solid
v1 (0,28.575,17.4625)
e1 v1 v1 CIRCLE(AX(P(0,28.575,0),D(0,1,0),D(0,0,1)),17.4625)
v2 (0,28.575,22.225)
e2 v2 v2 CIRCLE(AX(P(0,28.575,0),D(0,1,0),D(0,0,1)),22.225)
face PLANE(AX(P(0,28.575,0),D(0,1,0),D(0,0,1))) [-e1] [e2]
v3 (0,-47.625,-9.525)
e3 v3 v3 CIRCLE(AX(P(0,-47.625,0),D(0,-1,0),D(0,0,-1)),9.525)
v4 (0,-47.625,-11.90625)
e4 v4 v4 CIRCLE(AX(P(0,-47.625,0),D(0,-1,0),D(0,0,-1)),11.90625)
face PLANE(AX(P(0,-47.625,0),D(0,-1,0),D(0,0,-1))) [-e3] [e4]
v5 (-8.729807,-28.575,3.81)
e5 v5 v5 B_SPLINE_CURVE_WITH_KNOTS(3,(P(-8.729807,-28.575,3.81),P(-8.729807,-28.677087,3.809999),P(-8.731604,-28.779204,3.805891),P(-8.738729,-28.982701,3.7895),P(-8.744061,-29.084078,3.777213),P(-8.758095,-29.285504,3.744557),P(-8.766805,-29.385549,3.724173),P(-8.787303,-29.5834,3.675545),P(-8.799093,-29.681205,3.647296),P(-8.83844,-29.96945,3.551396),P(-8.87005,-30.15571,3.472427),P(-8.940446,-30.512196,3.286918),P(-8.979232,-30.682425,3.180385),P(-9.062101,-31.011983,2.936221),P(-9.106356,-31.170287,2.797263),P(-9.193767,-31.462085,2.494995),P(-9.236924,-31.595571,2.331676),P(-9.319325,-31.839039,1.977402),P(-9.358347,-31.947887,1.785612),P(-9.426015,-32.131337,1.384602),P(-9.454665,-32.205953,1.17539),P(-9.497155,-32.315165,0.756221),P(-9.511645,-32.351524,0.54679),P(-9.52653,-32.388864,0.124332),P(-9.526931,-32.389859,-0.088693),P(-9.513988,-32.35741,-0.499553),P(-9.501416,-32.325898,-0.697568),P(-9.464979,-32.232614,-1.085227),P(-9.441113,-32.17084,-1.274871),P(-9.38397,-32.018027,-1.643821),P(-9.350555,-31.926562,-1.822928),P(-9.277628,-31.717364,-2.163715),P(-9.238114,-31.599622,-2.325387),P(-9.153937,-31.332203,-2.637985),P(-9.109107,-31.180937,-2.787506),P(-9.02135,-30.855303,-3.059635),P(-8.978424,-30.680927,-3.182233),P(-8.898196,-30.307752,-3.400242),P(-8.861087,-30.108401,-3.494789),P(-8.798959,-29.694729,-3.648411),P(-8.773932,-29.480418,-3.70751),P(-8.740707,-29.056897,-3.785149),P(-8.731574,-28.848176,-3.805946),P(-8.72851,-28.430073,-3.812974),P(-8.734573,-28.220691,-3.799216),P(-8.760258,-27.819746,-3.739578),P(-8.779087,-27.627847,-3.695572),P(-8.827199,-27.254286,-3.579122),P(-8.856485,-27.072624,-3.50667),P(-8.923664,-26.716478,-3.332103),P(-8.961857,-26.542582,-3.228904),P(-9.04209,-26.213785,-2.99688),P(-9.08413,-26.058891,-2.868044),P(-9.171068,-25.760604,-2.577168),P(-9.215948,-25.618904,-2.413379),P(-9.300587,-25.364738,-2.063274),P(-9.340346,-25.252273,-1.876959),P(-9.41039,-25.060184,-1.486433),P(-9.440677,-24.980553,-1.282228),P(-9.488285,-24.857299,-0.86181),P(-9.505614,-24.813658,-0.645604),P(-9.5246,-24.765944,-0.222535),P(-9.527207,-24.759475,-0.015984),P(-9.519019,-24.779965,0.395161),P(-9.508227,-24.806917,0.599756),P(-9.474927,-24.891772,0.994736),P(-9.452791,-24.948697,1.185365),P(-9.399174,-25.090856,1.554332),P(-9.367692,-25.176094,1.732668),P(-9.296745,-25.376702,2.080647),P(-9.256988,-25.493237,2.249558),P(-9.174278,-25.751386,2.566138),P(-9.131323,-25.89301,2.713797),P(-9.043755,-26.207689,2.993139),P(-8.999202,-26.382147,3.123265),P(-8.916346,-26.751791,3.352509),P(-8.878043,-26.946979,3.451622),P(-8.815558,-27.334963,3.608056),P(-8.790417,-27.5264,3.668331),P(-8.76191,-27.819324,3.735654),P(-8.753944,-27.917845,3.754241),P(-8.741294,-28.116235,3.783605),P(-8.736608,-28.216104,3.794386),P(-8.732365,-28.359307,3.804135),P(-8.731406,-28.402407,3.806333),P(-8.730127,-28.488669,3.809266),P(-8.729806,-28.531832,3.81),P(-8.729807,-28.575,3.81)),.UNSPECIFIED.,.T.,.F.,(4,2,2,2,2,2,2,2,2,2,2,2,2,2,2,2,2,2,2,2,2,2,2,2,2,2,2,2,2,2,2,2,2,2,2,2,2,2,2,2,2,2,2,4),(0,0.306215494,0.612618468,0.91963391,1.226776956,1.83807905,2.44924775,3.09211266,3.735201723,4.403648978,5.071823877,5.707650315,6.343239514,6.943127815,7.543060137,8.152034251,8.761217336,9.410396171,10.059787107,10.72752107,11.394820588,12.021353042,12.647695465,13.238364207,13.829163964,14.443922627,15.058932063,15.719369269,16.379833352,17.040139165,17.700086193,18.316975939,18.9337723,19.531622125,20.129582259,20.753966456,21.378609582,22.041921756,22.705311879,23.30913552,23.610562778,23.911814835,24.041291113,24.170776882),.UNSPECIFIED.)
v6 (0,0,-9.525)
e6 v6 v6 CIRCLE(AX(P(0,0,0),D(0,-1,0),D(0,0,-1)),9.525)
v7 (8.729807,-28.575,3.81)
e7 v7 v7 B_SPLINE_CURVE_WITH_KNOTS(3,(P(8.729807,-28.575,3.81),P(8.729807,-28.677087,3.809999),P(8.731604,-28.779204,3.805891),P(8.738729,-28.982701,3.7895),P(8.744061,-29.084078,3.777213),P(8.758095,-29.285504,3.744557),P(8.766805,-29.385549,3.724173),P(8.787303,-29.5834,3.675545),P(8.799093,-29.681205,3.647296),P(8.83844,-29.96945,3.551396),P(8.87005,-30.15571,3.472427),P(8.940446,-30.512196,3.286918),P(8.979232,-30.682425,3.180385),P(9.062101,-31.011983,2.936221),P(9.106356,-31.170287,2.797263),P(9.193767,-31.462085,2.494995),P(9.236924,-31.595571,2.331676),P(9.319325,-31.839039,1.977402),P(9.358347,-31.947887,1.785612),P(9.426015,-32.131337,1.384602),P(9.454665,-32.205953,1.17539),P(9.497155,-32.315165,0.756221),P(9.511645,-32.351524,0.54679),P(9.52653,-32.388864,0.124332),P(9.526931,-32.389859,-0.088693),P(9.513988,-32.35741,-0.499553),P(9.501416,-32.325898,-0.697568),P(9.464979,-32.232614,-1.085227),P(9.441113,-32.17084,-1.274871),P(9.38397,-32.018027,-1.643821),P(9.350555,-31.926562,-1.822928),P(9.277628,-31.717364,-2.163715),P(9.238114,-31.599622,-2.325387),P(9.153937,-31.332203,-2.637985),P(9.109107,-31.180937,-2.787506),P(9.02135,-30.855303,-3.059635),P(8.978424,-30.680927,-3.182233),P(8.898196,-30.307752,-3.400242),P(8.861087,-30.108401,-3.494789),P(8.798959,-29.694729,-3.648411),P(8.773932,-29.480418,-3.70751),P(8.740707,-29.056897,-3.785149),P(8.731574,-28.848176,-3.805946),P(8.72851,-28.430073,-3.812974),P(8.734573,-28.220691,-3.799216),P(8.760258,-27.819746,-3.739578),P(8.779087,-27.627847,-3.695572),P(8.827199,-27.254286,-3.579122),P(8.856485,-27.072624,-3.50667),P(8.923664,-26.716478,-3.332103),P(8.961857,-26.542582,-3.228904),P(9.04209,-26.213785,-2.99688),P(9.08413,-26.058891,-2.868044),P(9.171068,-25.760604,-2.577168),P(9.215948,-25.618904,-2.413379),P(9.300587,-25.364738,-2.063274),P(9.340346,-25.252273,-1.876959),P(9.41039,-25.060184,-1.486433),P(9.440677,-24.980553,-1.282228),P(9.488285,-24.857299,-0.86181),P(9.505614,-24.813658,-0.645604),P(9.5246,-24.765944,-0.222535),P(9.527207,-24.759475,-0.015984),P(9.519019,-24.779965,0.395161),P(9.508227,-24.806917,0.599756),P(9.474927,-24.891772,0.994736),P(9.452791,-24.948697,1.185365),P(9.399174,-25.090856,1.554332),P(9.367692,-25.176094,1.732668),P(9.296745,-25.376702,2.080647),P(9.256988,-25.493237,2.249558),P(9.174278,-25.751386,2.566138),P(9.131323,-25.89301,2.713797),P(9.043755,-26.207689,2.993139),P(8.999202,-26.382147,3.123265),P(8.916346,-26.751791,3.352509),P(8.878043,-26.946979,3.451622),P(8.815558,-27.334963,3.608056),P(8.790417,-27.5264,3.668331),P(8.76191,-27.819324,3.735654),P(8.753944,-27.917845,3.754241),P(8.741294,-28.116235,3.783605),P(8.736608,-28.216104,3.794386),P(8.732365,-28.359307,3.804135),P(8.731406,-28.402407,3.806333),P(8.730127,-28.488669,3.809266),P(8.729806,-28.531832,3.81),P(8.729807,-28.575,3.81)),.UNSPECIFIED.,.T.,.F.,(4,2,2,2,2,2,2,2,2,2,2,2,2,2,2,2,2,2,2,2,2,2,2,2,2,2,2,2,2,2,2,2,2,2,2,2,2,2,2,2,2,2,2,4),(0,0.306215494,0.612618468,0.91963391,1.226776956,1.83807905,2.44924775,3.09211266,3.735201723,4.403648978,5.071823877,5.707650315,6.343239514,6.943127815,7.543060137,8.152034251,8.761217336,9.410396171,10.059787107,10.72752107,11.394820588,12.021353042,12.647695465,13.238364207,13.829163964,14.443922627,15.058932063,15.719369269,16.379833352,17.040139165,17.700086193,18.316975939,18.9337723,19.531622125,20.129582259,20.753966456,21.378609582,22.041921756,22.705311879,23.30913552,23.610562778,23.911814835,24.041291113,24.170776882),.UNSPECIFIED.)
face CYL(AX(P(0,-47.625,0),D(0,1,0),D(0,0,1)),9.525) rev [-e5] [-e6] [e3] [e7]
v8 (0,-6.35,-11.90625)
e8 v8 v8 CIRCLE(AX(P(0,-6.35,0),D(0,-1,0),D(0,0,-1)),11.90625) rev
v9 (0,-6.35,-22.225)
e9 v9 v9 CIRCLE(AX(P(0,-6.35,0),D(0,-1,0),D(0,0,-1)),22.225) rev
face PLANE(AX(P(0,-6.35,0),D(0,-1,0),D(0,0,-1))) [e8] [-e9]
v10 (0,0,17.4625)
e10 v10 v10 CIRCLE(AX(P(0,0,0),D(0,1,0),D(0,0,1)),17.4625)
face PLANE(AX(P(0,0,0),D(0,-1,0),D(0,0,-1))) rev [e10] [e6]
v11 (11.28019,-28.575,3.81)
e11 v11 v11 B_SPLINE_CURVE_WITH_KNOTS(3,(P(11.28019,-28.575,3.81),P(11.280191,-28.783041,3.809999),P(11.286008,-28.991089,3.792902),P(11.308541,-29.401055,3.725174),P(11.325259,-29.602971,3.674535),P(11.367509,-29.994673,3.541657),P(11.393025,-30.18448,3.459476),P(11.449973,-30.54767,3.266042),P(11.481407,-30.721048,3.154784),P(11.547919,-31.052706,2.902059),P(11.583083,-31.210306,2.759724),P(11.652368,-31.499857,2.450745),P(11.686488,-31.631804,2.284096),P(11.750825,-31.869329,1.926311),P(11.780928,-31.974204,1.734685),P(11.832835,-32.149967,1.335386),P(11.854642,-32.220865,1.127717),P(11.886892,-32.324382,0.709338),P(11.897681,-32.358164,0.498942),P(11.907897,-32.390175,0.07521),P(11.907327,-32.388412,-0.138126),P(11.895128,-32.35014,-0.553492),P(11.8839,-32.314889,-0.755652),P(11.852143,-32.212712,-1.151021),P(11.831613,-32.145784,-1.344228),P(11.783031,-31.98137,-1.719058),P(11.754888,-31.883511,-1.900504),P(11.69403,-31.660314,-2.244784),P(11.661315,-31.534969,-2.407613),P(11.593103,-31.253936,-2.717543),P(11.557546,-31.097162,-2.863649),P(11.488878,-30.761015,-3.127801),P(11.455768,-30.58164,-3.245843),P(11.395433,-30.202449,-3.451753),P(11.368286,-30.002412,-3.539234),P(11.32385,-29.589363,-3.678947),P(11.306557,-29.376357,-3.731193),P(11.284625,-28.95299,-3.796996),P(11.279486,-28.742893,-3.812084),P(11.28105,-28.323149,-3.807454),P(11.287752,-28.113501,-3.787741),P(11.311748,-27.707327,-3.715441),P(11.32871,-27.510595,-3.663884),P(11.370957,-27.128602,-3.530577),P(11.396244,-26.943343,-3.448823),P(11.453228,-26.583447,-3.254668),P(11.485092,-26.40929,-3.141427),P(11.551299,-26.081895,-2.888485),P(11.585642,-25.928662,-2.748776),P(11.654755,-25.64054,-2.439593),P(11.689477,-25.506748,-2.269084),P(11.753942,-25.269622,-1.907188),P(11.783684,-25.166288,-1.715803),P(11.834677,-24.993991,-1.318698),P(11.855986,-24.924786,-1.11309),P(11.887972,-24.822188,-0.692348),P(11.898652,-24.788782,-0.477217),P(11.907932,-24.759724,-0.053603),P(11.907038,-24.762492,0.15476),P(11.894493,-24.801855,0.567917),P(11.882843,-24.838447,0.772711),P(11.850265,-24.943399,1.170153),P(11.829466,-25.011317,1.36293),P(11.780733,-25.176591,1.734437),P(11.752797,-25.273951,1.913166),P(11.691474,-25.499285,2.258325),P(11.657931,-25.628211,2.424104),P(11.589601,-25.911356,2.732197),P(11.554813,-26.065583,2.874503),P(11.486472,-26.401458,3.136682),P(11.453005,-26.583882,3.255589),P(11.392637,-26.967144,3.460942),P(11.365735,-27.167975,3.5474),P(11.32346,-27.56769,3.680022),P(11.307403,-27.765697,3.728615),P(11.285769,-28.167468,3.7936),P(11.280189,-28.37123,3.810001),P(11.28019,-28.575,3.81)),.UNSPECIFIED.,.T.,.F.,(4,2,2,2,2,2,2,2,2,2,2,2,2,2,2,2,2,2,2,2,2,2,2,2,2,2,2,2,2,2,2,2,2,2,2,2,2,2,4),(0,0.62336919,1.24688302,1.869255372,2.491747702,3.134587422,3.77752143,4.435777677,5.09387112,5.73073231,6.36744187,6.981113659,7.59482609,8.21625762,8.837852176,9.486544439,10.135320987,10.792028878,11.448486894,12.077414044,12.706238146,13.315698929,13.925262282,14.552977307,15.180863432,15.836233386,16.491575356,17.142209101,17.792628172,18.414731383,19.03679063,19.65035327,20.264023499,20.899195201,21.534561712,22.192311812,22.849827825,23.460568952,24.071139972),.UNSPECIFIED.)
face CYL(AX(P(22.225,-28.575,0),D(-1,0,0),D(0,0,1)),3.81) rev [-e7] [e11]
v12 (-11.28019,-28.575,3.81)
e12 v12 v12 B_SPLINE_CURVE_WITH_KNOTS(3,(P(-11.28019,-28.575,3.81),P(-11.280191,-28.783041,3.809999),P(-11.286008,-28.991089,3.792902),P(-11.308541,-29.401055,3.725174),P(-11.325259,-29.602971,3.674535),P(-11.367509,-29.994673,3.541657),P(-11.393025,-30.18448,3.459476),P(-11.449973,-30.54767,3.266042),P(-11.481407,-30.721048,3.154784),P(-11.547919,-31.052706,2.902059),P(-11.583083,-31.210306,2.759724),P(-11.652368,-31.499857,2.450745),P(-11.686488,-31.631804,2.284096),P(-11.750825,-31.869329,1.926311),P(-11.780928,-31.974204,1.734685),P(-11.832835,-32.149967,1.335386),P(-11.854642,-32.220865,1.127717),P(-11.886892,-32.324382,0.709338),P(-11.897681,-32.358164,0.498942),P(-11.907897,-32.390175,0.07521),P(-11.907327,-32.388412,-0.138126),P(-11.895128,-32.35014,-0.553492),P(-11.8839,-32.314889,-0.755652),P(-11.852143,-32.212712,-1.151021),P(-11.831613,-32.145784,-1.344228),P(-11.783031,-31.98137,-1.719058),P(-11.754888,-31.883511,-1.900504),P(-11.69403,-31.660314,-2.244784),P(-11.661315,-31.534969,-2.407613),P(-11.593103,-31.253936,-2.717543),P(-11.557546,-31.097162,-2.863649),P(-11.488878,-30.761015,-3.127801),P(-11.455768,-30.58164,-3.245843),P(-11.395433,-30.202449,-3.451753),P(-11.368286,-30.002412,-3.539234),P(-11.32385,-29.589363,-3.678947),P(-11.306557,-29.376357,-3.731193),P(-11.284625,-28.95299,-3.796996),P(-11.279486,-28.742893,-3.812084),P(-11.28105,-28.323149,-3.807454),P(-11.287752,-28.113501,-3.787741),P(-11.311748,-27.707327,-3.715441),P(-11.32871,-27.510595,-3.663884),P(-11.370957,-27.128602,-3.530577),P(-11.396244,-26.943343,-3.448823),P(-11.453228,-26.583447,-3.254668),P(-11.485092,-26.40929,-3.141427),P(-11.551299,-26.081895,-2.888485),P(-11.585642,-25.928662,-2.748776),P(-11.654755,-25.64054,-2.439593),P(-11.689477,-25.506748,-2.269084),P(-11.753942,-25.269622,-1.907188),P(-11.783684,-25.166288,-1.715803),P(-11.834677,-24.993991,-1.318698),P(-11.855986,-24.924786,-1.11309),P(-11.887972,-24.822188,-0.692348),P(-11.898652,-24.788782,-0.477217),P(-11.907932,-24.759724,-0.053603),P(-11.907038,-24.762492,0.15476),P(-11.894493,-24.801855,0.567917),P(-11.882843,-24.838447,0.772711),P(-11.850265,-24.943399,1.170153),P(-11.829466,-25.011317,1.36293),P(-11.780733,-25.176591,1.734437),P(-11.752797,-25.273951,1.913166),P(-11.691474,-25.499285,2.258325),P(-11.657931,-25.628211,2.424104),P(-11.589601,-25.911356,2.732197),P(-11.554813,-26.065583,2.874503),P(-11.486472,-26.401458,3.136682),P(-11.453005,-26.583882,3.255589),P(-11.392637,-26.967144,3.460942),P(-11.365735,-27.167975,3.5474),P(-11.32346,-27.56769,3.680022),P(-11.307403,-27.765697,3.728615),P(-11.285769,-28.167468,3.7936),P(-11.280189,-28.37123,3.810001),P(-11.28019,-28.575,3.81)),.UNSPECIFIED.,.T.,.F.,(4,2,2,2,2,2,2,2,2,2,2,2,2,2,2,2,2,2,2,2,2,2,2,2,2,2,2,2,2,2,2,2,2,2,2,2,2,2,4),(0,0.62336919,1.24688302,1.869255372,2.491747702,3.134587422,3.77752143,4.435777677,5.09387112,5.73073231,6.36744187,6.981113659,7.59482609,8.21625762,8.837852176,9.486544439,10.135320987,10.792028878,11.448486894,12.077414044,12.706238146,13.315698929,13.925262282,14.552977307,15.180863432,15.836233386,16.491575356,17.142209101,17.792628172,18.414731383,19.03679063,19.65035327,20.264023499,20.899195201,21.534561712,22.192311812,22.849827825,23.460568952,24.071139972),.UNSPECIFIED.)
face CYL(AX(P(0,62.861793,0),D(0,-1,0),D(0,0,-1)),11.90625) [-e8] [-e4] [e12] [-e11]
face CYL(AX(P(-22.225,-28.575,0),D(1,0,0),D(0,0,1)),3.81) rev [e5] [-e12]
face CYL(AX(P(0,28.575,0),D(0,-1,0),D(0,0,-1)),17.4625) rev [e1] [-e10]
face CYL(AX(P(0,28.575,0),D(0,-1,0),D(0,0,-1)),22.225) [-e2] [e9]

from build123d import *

# Parameters (mm, degrees)
SKETCH1_R            = 22.225
SKETCH1_R_2          = 17.4625
SPRING_CHAMBER_DEPTH = 28.575
BALL_CHAMBER_START   = 47.625
SKETCH2_R            = 22.225
SKETCH2_R_2          = 9.525
BALL_CHAMBER_DEPTH   = 47.625
SKETCH5_R            = 3.81
BALL_HOLE_DEPTH      = 58.061737399
SKETCH8_R            = 22.225
SKETCH8_R_2          = 11.90625
CUT_EXTRUDE2_DEPTH   = 41.275


with BuildPart() as part:
    # Sketch1 → spring_chamber (new body)
    with BuildSketch(Plane(origin=(0, 0, 0), x_dir=(1, 0, 0), z_dir=(0, 1, 0))):
        with Locations(Location((0, 0, 0), (0, 0, 270))):
            Circle(SKETCH1_R)
        with Locations(Location((0, 0, 0), (0, 0, 270))):
            Circle(SKETCH1_R_2, mode=Mode.SUBTRACT)
    extrude(amount=SPRING_CHAMBER_DEPTH)

    # Sketch2 → ball_chamber (add)
    with BuildSketch(Plane.XZ.offset(BALL_CHAMBER_START)):
        with Locations(Location((0, 0, 0), (0, 0, 270))):
            Circle(SKETCH2_R)
        with Locations(Location((0, 0, 0), (0, 0, 270))):
            Circle(SKETCH2_R_2, mode=Mode.SUBTRACT)
    extrude(amount=-BALL_CHAMBER_DEPTH)

    # Sketch5 → ball_hole (cut, through all)
    with BuildSketch(Plane(origin=(0, 0, 0), x_dir=(0, 0, -1), z_dir=(1, 0, 0))):
        with Locations(Location((0, -28.575, 0), (0, 0, 180))):
            Circle(SKETCH5_R)
    ball_hole = extrude(amount=BALL_HOLE_DEPTH, mode=Mode.SUBTRACT)

    # Sketch8 → Cut-Extrude2 (cut)
    with BuildSketch(Plane.XZ.offset(47.625)):
        with Locations(Location((0, 0, 0), (0, 0, 270))):
            Circle(SKETCH8_R)
        with Locations(Location((0, 0, 0), (0, 0, 270))):
            Circle(SKETCH8_R_2, mode=Mode.SUBTRACT)
    extrude(amount=-CUT_EXTRUDE2_DEPTH, mode=Mode.SUBTRACT)

    # Mirror1: ball_hole across plane
    add(ball_hole.mirror(Plane(origin=(0, 0, 0), x_dir=(0, 0, 1), z_dir=(1, 0, 0))), mode=Mode.SUBTRACT)


solid = part.part
